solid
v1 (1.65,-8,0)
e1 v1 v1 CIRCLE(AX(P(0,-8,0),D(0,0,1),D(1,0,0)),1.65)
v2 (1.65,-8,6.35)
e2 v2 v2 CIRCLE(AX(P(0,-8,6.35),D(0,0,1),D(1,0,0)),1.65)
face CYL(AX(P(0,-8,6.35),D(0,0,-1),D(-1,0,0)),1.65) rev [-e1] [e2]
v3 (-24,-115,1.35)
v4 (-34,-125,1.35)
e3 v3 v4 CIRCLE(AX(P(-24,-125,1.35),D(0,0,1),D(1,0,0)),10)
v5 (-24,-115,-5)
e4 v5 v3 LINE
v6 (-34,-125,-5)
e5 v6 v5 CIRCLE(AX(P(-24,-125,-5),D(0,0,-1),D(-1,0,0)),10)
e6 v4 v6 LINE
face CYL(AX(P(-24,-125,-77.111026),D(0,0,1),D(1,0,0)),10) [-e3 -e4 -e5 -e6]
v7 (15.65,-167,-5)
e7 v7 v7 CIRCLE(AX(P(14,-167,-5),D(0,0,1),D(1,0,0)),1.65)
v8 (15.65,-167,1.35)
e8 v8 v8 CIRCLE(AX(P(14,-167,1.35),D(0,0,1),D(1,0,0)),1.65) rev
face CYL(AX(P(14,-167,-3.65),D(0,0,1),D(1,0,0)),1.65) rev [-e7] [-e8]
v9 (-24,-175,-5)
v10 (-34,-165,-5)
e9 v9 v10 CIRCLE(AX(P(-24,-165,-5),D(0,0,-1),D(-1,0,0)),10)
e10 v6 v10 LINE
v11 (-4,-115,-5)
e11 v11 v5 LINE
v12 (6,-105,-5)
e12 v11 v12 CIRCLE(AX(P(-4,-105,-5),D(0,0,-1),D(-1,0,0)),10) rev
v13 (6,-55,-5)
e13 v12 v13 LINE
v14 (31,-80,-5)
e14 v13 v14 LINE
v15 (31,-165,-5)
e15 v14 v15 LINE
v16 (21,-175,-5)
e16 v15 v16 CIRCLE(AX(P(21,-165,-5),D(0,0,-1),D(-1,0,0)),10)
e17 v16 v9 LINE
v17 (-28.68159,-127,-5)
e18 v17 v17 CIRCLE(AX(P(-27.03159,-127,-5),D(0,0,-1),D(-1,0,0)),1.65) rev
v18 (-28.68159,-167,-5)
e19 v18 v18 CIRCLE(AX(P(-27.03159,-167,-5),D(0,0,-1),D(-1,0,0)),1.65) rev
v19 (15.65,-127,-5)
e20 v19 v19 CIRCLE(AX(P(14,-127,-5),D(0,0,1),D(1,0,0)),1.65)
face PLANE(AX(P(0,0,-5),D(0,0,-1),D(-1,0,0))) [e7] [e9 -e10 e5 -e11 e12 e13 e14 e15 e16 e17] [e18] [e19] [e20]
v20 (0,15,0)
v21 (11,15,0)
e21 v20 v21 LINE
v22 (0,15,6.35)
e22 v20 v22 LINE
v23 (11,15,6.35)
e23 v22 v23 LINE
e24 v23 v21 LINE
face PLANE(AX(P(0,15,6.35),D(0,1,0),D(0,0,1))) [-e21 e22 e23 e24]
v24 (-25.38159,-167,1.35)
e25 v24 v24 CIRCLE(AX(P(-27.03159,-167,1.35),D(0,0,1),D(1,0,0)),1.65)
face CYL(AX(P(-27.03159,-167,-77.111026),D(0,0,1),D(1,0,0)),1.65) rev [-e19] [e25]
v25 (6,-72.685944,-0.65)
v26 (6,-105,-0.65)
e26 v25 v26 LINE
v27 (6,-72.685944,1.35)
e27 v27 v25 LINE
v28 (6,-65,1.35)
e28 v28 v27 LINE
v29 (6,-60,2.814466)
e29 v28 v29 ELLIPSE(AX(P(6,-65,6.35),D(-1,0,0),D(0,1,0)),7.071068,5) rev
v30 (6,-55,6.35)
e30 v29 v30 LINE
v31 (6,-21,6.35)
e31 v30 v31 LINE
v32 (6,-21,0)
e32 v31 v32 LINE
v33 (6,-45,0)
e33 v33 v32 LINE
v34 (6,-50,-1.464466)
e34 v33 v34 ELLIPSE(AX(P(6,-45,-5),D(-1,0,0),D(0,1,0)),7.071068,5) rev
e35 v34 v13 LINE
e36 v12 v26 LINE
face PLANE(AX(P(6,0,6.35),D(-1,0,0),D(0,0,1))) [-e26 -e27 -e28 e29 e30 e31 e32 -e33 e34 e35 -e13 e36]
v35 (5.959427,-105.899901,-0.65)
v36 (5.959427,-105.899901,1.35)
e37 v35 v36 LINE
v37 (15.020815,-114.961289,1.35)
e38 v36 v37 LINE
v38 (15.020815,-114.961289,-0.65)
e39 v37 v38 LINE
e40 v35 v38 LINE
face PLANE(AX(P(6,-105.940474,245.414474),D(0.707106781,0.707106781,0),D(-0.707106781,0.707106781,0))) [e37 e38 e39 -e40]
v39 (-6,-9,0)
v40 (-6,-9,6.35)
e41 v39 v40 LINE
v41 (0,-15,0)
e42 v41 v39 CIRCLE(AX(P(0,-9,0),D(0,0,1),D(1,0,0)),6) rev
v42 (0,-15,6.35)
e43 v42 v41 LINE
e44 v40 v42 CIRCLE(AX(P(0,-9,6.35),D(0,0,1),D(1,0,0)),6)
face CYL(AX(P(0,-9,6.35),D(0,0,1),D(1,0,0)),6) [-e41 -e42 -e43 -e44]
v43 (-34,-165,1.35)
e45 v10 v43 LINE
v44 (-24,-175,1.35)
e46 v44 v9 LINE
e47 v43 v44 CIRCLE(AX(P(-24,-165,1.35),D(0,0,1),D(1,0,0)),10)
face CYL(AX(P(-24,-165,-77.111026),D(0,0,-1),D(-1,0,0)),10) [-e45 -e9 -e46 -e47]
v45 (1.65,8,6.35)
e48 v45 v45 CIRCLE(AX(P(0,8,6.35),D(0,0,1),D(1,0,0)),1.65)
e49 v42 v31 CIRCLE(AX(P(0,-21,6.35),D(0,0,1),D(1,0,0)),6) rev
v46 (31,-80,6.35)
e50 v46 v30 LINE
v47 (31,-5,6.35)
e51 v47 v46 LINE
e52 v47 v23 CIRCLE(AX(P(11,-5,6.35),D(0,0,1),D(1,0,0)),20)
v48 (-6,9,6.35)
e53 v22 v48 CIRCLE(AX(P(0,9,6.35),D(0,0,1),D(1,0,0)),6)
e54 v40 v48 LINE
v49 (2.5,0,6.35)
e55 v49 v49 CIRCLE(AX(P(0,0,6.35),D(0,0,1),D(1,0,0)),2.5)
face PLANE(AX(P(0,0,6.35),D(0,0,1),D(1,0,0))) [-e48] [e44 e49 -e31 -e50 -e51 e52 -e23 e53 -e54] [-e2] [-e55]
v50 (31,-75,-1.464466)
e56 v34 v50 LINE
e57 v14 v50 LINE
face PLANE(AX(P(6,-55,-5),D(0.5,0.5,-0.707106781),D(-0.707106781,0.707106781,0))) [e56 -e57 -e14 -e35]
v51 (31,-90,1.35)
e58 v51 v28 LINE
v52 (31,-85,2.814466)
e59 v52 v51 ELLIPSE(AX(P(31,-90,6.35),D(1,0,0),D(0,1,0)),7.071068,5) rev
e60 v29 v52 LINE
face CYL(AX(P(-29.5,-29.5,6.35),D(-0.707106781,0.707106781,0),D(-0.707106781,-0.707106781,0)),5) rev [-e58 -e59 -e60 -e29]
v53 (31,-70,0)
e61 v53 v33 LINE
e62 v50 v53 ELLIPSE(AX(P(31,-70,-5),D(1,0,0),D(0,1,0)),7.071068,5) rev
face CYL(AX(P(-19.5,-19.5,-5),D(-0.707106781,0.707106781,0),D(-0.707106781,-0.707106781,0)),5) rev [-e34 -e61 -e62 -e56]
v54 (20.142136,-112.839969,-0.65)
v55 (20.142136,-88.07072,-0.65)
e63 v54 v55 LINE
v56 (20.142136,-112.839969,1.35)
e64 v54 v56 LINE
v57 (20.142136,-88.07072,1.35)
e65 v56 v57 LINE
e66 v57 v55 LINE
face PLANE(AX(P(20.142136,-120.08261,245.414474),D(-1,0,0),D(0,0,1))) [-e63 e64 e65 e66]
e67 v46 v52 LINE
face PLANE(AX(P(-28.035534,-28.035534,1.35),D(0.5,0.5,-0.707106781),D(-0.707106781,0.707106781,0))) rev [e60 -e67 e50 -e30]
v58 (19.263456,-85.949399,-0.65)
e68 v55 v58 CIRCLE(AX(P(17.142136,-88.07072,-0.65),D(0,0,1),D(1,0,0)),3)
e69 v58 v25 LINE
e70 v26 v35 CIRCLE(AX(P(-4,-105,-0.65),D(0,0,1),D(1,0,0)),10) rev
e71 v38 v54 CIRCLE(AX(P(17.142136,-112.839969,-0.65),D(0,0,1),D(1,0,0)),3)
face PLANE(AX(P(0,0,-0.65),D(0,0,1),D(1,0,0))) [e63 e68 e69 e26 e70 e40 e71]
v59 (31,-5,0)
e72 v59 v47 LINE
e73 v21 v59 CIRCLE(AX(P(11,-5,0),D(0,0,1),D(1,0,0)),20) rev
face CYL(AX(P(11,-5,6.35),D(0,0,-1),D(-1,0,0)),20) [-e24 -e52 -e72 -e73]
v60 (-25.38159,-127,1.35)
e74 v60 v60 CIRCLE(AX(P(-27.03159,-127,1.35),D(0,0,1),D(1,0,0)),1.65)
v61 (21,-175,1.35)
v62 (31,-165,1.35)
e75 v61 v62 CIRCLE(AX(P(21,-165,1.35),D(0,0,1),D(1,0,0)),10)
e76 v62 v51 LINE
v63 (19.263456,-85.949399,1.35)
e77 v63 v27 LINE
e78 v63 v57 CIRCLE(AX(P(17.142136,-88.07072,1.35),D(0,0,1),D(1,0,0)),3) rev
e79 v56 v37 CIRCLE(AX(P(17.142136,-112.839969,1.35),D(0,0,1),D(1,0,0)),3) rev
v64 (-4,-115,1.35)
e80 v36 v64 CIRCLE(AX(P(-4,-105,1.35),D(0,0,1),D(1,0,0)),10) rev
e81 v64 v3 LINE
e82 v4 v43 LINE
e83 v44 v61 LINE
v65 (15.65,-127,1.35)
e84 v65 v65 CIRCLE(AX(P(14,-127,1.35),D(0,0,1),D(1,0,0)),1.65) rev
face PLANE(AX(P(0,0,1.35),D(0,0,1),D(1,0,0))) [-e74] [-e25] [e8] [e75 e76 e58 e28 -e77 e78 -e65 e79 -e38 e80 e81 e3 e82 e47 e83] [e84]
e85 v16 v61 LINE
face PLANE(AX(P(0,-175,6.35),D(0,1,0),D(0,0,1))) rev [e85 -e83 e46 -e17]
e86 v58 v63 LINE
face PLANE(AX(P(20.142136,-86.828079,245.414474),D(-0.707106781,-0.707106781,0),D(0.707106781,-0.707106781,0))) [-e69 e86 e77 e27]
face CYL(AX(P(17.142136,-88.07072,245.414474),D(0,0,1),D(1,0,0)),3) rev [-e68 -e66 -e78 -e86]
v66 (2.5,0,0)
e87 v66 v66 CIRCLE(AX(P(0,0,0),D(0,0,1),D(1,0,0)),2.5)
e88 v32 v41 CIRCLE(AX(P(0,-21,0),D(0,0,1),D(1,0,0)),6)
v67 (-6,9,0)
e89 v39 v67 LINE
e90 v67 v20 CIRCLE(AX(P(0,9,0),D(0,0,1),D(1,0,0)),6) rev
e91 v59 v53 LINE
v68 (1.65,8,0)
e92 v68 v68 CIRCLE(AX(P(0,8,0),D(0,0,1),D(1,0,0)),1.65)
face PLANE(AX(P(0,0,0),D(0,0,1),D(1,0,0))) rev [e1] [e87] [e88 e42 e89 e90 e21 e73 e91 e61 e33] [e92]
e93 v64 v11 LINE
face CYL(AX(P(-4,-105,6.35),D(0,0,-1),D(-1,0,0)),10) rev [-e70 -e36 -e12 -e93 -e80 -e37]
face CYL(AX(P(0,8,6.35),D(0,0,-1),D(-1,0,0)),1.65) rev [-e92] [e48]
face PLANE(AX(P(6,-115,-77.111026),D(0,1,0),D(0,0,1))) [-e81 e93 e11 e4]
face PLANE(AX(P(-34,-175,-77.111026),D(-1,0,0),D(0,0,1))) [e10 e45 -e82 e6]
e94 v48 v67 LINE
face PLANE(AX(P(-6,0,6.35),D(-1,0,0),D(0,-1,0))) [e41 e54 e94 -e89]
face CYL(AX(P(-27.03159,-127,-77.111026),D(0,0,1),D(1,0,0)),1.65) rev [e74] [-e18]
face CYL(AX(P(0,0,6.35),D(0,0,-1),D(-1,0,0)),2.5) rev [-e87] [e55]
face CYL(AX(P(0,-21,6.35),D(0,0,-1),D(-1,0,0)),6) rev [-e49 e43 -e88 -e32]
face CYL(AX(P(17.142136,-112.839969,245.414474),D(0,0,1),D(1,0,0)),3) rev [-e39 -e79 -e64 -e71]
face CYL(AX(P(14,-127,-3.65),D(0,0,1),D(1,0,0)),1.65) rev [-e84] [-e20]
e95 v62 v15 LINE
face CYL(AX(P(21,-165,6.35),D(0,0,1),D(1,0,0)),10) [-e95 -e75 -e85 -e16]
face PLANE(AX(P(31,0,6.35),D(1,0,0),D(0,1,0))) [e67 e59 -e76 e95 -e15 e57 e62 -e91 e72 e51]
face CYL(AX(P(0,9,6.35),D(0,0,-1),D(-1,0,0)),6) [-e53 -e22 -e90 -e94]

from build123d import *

# Parameters (mm, degrees)
SKETCH1_W               = 12
SKETCH1_H               = 30
SKETCH1_R               = 1.65
SKETCH1_R_2             = 2.5
BOSS_EXTRUDE1_DEPTH     = 6.35
FILLET1_R               = 6
FILLET2_R               = 6
FILLET3_R               = 20
SKETCH2_R               = 1.65
CUT_EXTRUDE1_DEPTH      = 10
CUT_EXTRUDE3_DEPTH      = 5
BOSS_EXTRUDE3_DEPTH     = 5
CHAMFER2_SIZE           = 5
FILLET5_R               = 5
SKETCH6_R               = 1.65
CUT_EXTRUDE4_DEPTH      = 178.83791075
CUT_EXTRUDE5_DEPTH      = 178.83791075
CUT_EXTRUDE5_DEPTH_BACK = 2
FILLET6_R               = 3
SKETCH8_W               = 40
SKETCH8_H               = 60
SKETCH8_R               = 1.65
BOSS_EXTRUDE4_DEPTH     = 6.35
FILLET7_R               = 10


with BuildPart() as part:
    # Sketch1 → Boss-Extrude1 (new body)
    # profile 1 of 2: a face of its own
    with BuildSketch(Plane.XY):
        Polygon((6, 15), (6, -15), (6, -175), (31, -175), (31, 15), align=None)
    # profile 2 of 2: a face of its own
    with BuildSketch(Plane.XY):
        Rectangle(SKETCH1_W, SKETCH1_H)
        with Locations((0, -8)):
            Circle(SKETCH1_R, mode=Mode.SUBTRACT)
        Circle(SKETCH1_R_2, mode=Mode.SUBTRACT)
        with Locations((0, 8)):
            Circle(SKETCH1_R, mode=Mode.SUBTRACT)
    extrude(amount=BOSS_EXTRUDE1_DEPTH)

    # Fillet1
    fillet1_edges = [part.edges().sort_by_distance(p)[0] for p in [
        (6, -15, 3.175),
    ]]
    fillet(fillet1_edges, radius=FILLET1_R)
    fillet1_2_edges = [part.edges().sort_by_distance(p)[0] for p in [
        (-6, -15, 3.175),
    ]]
    fillet(fillet1_2_edges, radius=FILLET1_R - 0.0001)  # a hair under: the kernel refuses the full size

    # Fillet2
    fillet2_edges = [part.edges().sort_by_distance(p)[0] for p in [
        (-6, 15, 3.175),
    ]]
    fillet(fillet2_edges, radius=FILLET2_R)

    # Fillet3
    fillet3_edges = [part.edges().sort_by_distance(p)[0] for p in [
        (31, 15, 3.175),
    ]]
    fillet(fillet3_edges, radius=FILLET3_R)

    # Sketch2 → Cut-Extrude1 (cut)
    with BuildSketch(Plane.XY.offset(6.35)):
        with Locations((14, -167)):
            Circle(SKETCH2_R)
        with Locations((14, -127)):
            Circle(SKETCH2_R)
    extrude(amount=-CUT_EXTRUDE1_DEPTH, mode=Mode.SUBTRACT)

    # Sketch3 → Cut-Extrude3 (cut)
    with BuildSketch(Plane.XY.offset(6.35)):
        Polygon((31, -175), (31, -80), (6, -55), (6, -175), align=None)
    extrude(amount=-CUT_EXTRUDE3_DEPTH, mode=Mode.SUBTRACT)

    # Sketch5 → Boss-Extrude3 (add)
    with BuildSketch(Plane(origin=(0, 0, 0), x_dir=(-1, 0, 0), z_dir=(0, 0, -1))):
        Polygon((-6, -175), (-6, -55), (-31, -80), (-31, -175), align=None)
    extrude(amount=BOSS_EXTRUDE3_DEPTH)

    # Chamfer2
    chamfer2_edges = [part.edges().sort_by_distance(p)[0] for p in [
        (18.5, -67.5, 1.35),
        (18.5, -67.5, 0),
    ]]
    chamfer(chamfer2_edges, length=CHAMFER2_SIZE - 0.0001)  # a hair under: the kernel refuses the full size

    # Fillet5
    fillet5_edges = [part.edges().sort_by_distance(p)[0] for p in [
        (18.5, -74.570926391, 1.35),
        (18.5, -60.429073609, 0),
    ]]
    fillet(fillet5_edges, radius=FILLET5_R)

    # Sketch6 → Cut-Extrude4 (cut, through all)
    with BuildSketch(Plane.XY.offset(1.35)):
        with Locations((14, -127)):
            Circle(SKETCH6_R)
        with Locations((14, -167)):
            Circle(SKETCH6_R)
    extrude(amount=-CUT_EXTRUDE4_DEPTH, mode=Mode.SUBTRACT)

    # Sketch7 → Cut-Extrude5 (cut, two sides: drawn at the far end of the back side and taken through both)
    with BuildSketch(Plane.XY.offset(1.35).offset(-CUT_EXTRUDE5_DEPTH_BACK)):
        Polygon((-175.7227113, 75.782237154), (6, -105.940474145), (20.142135624, -120.082609769), (20.142135624, -86.828079155), (6, -72.685943532), (-175.7227113, 109.036767768), (-689.712157123, 109.036767768), (-689.712157123, 75.782237154), align=None)
    extrude(amount=CUT_EXTRUDE5_DEPTH + CUT_EXTRUDE5_DEPTH_BACK, mode=Mode.SUBTRACT)

    # Fillet6
    fillet6_edges = [part.edges().sort_by_distance(p)[0] for p in [
        (20.142135624, -86.828079155, 0.35),
        (20.142135624, -120.082609769, 0.35),
    ]]
    fillet(fillet6_edges, radius=FILLET6_R)

    # Sketch8 → Boss-Extrude4 (add)
    with BuildSketch(Plane.XY.offset(1.35)):
        with Locations((-14, -145)):
            Rectangle(SKETCH8_W, SKETCH8_H)
        with Locations((-27.03159011, -127)):
            Circle(SKETCH8_R, mode=Mode.SUBTRACT)
        with Locations((-27.03159011, -167)):
            Circle(SKETCH8_R, mode=Mode.SUBTRACT)
    extrude(amount=-BOSS_EXTRUDE4_DEPTH)

    # Fillet7
    fillet7_edges = [part.edges().sort_by_distance(p)[0] for p in [
        (6, -115, -1.825),
        (31, -175, -1.825),
        (-34, -175, -1.825),
        (-34, -115, -1.825),
    ]]
    fillet(fillet7_edges, radius=FILLET7_R)


solid = part.part
